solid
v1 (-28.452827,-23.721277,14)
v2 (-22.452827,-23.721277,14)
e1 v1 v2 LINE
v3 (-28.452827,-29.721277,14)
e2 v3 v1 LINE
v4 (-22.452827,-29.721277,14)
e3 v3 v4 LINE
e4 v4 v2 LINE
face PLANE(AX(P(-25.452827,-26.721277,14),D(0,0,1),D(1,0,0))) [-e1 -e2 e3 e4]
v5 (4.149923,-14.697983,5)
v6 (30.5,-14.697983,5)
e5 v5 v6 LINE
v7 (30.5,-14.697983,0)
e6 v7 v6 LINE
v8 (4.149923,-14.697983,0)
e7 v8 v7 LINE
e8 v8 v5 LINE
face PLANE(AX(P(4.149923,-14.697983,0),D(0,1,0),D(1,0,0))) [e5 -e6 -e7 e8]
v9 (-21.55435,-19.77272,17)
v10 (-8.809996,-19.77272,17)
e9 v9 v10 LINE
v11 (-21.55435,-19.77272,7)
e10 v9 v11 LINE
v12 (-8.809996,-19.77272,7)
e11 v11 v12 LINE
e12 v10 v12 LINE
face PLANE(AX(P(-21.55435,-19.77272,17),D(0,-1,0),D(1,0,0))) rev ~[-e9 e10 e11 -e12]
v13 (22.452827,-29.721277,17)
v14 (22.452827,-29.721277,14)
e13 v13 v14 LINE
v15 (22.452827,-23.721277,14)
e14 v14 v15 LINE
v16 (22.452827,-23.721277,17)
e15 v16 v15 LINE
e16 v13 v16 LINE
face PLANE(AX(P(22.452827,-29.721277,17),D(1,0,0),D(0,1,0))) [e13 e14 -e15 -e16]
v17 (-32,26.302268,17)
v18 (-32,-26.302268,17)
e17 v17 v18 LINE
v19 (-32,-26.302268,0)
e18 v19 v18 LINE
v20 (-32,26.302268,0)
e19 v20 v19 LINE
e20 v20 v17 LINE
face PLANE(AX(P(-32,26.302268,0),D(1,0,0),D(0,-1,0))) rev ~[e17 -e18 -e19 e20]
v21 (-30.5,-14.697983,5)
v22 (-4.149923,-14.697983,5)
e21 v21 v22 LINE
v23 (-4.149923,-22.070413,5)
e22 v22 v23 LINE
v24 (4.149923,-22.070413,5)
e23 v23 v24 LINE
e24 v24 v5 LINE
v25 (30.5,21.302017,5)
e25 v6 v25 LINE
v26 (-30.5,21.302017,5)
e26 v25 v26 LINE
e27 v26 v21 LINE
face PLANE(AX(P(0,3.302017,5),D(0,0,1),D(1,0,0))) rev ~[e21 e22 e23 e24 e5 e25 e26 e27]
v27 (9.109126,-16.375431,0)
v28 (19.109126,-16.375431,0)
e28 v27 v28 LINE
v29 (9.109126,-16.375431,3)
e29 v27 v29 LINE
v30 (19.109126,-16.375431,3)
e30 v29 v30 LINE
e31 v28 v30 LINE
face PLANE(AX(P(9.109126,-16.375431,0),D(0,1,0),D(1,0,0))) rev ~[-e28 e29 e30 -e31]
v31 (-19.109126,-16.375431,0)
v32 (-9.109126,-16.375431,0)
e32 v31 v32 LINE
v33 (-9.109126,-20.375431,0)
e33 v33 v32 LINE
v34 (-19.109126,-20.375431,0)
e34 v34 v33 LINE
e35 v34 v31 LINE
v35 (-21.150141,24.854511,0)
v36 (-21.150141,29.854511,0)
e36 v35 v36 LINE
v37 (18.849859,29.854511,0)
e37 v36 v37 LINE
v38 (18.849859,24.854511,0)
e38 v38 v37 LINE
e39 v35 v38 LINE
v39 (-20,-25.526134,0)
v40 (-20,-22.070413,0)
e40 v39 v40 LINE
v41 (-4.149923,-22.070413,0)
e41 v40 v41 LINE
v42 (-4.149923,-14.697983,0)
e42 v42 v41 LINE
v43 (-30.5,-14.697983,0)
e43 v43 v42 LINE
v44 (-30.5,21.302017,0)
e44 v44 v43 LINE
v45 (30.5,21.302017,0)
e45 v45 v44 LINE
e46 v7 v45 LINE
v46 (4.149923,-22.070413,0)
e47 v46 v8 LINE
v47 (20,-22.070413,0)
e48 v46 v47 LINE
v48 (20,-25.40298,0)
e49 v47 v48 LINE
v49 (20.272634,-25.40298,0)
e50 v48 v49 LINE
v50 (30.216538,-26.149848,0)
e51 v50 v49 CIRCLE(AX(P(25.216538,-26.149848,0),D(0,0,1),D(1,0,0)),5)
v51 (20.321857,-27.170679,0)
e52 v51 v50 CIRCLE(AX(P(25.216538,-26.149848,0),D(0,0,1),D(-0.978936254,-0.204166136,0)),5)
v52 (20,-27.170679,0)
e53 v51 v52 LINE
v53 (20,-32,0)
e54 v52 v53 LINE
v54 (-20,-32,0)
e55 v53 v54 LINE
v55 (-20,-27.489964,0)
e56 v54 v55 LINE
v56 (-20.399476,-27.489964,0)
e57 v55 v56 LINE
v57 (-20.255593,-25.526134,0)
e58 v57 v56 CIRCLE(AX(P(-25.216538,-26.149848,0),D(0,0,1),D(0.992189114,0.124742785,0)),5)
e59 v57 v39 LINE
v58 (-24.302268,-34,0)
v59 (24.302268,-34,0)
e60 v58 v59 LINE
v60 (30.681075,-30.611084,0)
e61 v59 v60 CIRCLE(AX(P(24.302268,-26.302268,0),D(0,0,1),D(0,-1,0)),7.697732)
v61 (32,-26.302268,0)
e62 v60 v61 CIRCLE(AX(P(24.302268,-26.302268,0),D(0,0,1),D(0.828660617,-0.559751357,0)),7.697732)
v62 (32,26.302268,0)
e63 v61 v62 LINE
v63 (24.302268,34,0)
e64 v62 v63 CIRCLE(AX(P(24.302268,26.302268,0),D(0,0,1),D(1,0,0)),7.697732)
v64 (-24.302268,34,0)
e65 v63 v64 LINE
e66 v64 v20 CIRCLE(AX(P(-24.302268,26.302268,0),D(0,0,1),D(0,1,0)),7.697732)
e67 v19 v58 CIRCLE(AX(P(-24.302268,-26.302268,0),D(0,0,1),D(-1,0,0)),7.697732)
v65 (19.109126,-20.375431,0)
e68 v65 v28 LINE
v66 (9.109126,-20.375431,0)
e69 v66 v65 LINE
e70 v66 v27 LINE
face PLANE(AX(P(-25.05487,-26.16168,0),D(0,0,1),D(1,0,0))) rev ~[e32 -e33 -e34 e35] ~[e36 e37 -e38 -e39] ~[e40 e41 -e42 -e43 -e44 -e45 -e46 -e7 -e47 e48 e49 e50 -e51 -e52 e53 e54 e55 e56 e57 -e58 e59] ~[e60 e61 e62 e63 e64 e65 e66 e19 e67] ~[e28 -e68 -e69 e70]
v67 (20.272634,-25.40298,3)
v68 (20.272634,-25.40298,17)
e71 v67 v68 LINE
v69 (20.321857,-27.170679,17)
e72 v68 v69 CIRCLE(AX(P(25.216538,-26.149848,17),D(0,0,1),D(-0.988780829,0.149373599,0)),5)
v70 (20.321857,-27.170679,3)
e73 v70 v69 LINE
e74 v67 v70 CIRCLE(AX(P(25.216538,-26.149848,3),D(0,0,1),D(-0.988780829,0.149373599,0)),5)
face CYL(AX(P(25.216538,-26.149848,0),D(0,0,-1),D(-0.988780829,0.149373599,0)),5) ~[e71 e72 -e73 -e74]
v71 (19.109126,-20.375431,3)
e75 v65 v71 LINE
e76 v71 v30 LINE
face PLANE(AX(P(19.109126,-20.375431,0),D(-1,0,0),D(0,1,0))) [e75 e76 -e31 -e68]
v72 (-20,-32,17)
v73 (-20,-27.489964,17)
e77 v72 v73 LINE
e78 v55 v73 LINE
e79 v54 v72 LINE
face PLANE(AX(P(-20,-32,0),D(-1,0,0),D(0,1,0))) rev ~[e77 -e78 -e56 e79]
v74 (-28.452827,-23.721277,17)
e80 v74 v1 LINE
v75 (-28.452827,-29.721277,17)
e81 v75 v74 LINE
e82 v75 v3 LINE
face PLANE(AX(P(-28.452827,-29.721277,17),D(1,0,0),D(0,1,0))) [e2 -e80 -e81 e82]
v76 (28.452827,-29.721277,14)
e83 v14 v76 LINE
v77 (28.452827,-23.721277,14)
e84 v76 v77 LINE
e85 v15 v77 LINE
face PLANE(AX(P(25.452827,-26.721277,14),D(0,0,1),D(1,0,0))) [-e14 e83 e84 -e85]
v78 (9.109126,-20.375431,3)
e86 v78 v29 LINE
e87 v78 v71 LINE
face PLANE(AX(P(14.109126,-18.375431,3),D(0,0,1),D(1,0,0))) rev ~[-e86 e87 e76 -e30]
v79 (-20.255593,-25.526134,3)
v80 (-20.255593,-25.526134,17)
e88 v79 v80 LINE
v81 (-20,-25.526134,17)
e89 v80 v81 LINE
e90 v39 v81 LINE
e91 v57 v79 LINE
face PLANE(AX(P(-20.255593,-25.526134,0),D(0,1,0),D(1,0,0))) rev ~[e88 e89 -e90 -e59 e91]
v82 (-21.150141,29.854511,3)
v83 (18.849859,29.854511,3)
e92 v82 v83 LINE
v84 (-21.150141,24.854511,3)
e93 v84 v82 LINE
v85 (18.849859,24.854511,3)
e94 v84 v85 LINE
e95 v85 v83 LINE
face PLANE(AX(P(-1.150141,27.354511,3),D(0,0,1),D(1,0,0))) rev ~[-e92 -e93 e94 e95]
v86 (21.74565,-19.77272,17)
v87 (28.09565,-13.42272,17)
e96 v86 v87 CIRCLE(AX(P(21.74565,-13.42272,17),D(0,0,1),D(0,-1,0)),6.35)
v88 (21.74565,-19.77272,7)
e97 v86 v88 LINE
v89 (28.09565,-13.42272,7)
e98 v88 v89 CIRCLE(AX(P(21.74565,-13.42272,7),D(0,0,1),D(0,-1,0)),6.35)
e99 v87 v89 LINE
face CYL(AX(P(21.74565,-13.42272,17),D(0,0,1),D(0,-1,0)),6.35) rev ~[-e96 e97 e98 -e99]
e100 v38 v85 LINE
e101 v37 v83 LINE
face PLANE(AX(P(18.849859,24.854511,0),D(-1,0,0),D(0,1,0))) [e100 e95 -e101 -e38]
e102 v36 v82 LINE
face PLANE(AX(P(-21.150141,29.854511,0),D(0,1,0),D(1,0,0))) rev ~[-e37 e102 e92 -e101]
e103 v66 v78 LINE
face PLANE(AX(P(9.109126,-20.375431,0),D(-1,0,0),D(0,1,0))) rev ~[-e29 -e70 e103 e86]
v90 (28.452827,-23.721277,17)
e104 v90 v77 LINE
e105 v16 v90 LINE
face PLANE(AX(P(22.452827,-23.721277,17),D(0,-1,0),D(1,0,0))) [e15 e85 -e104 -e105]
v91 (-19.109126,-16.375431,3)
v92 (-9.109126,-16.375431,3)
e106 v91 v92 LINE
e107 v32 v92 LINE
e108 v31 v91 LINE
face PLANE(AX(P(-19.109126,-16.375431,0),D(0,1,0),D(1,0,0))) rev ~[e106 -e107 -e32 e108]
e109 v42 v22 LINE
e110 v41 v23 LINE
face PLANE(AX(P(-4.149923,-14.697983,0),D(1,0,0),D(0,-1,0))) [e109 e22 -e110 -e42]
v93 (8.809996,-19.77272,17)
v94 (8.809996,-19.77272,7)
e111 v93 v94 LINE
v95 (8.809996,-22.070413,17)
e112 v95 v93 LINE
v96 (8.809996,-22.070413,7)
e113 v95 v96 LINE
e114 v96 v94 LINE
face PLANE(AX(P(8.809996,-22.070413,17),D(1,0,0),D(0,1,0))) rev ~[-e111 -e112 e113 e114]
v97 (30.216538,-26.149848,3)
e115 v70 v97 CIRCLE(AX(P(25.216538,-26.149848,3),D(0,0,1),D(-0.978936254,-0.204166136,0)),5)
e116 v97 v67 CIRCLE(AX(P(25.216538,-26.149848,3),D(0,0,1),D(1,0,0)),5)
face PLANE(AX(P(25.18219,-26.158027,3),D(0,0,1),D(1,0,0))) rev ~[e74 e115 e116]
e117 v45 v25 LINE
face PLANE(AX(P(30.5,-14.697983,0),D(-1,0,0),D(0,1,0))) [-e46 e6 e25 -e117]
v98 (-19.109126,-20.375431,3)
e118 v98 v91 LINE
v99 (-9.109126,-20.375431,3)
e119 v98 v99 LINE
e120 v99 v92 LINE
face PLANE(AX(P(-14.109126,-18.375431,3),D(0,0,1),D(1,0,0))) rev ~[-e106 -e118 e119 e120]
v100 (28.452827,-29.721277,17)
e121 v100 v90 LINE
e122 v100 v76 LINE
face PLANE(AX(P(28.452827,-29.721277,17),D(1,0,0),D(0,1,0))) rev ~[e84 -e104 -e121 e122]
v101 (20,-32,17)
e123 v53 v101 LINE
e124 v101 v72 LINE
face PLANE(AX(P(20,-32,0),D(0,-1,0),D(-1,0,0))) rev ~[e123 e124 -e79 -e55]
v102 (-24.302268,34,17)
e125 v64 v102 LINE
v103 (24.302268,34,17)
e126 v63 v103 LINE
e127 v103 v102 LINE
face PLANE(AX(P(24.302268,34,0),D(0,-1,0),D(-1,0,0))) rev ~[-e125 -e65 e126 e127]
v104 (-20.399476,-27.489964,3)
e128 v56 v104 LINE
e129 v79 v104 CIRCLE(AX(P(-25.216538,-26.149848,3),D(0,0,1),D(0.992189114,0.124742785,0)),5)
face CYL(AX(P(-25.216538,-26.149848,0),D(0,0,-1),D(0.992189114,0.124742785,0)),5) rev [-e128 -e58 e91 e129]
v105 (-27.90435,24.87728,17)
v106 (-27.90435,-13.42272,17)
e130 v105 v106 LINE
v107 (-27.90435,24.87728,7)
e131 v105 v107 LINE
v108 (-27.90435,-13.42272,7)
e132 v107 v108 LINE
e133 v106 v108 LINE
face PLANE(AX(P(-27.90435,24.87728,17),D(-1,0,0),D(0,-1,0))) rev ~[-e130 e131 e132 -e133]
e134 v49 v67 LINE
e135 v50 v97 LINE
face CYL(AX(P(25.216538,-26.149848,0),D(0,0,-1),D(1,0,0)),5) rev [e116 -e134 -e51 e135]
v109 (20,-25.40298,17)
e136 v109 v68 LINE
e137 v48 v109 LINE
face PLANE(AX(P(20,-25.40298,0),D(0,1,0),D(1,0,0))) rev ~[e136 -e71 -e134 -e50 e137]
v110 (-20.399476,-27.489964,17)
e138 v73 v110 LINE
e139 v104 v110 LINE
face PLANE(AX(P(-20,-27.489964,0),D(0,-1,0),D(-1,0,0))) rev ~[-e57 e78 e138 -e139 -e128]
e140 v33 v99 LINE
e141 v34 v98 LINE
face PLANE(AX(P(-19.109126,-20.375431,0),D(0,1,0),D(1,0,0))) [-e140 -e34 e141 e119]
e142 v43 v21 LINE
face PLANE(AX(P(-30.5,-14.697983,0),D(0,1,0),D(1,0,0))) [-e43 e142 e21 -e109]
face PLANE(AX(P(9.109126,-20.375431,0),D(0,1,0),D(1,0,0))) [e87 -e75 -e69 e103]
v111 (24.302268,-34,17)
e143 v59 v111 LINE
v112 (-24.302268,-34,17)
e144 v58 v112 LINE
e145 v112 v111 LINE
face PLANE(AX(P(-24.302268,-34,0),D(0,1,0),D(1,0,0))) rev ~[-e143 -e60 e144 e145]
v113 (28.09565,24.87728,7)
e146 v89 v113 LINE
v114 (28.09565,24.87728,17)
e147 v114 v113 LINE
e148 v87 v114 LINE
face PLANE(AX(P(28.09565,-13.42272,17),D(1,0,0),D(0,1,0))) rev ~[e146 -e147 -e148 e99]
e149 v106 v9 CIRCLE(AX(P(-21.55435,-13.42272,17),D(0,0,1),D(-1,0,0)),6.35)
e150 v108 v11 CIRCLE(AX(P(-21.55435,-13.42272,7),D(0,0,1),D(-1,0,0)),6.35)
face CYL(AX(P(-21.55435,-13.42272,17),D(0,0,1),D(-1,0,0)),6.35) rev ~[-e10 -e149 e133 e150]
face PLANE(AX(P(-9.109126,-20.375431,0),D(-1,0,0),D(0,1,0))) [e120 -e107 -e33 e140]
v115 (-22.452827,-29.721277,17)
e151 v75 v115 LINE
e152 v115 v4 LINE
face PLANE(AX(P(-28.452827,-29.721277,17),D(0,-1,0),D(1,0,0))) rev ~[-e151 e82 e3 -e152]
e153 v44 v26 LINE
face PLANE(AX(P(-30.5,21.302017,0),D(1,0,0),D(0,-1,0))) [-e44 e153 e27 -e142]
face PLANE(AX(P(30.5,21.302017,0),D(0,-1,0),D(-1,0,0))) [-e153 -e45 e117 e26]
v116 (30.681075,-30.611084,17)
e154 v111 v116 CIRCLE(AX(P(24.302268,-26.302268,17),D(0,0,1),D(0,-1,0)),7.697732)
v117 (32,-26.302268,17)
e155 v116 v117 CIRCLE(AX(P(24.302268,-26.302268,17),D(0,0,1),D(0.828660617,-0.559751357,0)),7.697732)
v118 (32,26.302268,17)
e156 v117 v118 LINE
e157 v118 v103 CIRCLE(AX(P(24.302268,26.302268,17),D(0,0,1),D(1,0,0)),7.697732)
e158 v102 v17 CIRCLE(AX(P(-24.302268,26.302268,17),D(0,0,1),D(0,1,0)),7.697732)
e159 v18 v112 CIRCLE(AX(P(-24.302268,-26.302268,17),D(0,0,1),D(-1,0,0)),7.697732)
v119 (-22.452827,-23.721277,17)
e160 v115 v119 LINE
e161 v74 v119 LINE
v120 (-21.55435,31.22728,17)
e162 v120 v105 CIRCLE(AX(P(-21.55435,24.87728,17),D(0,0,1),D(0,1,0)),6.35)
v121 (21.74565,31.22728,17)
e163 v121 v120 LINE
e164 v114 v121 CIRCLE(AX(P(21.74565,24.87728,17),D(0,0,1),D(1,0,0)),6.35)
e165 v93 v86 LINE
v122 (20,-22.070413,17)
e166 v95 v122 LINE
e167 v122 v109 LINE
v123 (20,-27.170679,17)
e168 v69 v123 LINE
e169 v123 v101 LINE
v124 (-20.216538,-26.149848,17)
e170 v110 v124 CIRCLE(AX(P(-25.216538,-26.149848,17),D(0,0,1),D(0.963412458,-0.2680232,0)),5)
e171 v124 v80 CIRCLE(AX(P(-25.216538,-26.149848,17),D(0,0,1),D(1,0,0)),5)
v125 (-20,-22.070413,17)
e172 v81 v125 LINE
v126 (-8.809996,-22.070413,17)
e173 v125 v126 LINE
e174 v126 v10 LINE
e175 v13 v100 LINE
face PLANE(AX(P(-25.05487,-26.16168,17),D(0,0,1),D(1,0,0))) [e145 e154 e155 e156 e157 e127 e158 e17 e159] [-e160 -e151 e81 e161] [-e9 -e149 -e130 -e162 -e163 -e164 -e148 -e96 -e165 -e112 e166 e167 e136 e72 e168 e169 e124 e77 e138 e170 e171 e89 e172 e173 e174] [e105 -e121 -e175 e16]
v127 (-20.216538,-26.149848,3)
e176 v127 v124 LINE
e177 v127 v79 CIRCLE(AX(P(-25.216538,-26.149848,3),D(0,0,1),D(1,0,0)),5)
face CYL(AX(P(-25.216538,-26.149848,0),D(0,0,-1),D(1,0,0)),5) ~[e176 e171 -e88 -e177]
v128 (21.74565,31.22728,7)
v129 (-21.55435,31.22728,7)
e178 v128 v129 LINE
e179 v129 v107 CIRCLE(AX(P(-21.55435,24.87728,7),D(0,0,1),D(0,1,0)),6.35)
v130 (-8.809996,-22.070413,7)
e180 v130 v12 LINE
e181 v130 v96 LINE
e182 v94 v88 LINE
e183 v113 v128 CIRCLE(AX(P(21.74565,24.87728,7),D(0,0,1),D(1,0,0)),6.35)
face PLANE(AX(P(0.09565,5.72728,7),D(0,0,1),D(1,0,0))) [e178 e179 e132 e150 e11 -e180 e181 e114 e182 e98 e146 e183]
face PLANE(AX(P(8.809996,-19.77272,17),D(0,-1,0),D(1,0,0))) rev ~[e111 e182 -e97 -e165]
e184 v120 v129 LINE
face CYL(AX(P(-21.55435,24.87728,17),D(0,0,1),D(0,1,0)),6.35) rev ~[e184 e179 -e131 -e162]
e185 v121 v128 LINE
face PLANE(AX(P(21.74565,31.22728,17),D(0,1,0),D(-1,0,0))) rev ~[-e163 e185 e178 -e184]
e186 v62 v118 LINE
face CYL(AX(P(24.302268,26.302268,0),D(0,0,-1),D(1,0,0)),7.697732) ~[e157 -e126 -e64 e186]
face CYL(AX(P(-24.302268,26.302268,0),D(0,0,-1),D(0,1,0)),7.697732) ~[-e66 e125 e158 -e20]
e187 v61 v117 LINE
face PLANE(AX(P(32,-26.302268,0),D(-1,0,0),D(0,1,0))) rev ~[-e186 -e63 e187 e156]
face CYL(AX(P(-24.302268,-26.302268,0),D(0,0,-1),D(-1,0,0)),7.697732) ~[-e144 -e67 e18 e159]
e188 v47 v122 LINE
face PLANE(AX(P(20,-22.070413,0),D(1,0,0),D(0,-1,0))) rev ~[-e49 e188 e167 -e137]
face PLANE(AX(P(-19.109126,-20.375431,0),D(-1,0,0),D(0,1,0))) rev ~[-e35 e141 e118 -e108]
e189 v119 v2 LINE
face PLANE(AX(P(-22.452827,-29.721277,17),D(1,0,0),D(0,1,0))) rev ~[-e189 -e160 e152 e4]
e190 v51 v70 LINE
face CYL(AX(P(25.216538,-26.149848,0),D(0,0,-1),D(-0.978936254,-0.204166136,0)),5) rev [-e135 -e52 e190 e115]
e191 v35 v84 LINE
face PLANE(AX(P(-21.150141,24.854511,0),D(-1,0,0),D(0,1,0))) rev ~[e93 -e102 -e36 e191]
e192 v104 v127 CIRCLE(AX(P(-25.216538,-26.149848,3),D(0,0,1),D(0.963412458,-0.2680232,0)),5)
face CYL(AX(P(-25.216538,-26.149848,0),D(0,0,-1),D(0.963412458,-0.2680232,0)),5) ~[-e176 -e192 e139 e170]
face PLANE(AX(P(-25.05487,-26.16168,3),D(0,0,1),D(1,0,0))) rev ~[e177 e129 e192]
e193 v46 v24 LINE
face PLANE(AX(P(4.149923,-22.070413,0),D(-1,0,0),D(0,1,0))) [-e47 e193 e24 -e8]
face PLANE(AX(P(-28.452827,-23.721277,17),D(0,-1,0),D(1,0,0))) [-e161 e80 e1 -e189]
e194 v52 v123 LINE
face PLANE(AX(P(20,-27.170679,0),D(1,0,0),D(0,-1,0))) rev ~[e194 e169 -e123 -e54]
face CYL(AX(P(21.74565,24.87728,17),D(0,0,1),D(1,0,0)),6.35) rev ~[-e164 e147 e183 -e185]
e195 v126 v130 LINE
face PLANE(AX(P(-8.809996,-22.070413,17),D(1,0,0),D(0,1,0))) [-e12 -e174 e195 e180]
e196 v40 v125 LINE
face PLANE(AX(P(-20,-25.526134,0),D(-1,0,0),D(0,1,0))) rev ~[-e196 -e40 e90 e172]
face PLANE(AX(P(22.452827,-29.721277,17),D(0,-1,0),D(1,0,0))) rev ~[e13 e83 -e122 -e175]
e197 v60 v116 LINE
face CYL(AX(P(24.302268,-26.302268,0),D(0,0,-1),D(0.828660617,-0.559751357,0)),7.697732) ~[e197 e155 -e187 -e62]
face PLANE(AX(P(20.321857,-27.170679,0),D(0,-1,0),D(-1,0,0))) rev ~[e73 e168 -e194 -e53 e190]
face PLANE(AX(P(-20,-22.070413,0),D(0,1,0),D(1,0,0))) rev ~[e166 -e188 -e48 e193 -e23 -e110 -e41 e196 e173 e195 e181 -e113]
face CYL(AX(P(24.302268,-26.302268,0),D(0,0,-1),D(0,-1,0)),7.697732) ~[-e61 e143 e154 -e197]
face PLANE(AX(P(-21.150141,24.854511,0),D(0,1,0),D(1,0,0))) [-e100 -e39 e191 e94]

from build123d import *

# Parameters (mm, degrees)
F1_DEPTH  = 17
F2_DEPTH  = 5
F3_DEPTH  = 17
F4_DEPTH  = 3
F5_W      = 17.619991675
F5_H      = 2.2976936506
F6_DEPTH  = 10
F7_W      = 10
F7_H      = 4
F7_W_2    = 40
F7_H_2    = 5
F8_DEPTH  = 3
F9_W      = 6
F9_H      = 6
F10_DEPTH = 3


# Not quite as in the source:
# - a feature names something its author has since deleted; it is built from what else it names


with BuildPart() as f1:
    # F0 (on Top) → F1 (new body)
    with BuildSketch(Plane.XY):
        with BuildLine():
            Line((24.3022678875, 34), (-24.3022678875, 34))
            ThreePointArc((-24.3022678875, 34), (-29.745386464, 31.745386464), (-32, 26.3022678875))
            Line((-32, 26.3022678875), (-32, 15.1276998222))
            Line((-32, 15.1276998222), (-30.5, 15.1276998222))
            Line((-30.5, 15.1276998222), (-30.5, 21.3020170704))
            Line((-30.5, 21.3020170704), (30.5, 21.3020170704))
            Line((30.5, 21.3020170704), (30.5, 14.2477769405))
            Line((30.5, 14.2477769405), (32, 14.2477769405))
            Line((32, 14.2477769405), (32, 26.3022678875))
            ThreePointArc((32, 26.3022678875), (29.745386464, 31.745386464), (24.3022678875, 34))
        make_face()
        with BuildLine():
            Line((-30.5, 15.1276998222), (-32, 15.1276998222))
            Line((-32, 15.1276998222), (-32, -26.3022678875))
            ThreePointArc((-32, -26.3022678875), (-29.745386464, -31.745386464), (-24.3022678875, -34))
            Line((-24.3022678875, -34), (0, -34))
            Line((0, -34), (0, -32))
            Line((0, -32), (-20, -32))
            Line((-20, -32), (-20, -27.4899639189))
            Line((-20, -27.4899639189), (-20.3994758379, -27.4899639189))
            ThreePointArc((-20.3994758379, -27.4899639189), (-30.2031719041, -25.7844938681), (-20.255592559, -25.5261339915))
            Line((-20.255592559, -25.5261339915), (-20, -25.5261339915))
            Line((-20, -25.5261339915), (-20, -22.0704134554))
            Line((-20, -22.0704134554), (-4.1499226354, -22.0704134554))
            Line((-4.1499226354, -22.0704134554), (-4.1499226354, -14.6979829296))
            Line((-4.1499226354, -14.6979829296), (-30.5, -14.6979829296))
            Line((-30.5, -14.6979829296), (-30.5, 15.1276998222))
        make_face()
        with BuildLine():
            Line((32, -26.3022678875), (32, 14.2477769405))
            Line((32, 14.2477769405), (30.5, 14.2477769405))
            Line((30.5, 14.2477769405), (30.5, -14.6979829296))
            Line((30.5, -14.6979829296), (4.1499226354, -14.6979829296))
            Line((4.1499226354, -14.6979829296), (4.1499226354, -22.0704134554))
            Line((4.1499226354, -22.0704134554), (20, -22.0704134554))
            Line((20, -22.0704134554), (20, -25.4029799253))
            Line((20, -25.4029799253), (20.2726339823, -25.4029799253))
            ThreePointArc((20.2726339823, -25.4029799253), (25.5910239568, -21.1638916046), (30.2165381279, -26.1498479185))
            ThreePointArc((30.2165381279, -26.1498479185), (25.7296627026, -31.1234485429), (20.3218568596, -27.1706786007))
            Line((20.3218568596, -27.1706786007), (20, -27.1706786007))
            Line((20, -27.1706786007), (20, -32))
            Line((20, -32), (0, -32))
            Line((0, -32), (0, -34))
            Line((0, -34), (24.3022678875, -34))
            ThreePointArc((24.3022678875, -34), (27.9138443036, -33.100178998), (30.6810753302, -30.6110838832))
            ThreePointArc((30.6810753302, -30.6110838832), (31.6628871063, -28.555346757), (32, -26.3022678875))
        make_face()
        Polygon((-30.5, 21.3020170704), (-30.5, 15.1276998222), (-30.5, -14.6979829296), (-4.1499226354, -14.6979829296), (4.1499226354, -14.6979829296), (30.5, -14.6979829296), (30.5, 14.2477769405), (30.5, 21.3020170704), align=None)
        Polygon((4.1499226354, -14.6979829296), (-4.1499226354, -14.6979829296), (-4.1499226354, -22.0704134554), (0, -22.0704134554), (4.1499226354, -22.0704134554), align=None)
        with BuildLine():
            ThreePointArc((20.2726339823, -25.4029799253), (20.2184754644, -26.2890226707), (20.3218568596, -27.1706786007))
            ThreePointArc((20.3218568596, -27.1706786007), (25.7296627026, -31.1234485429), (30.2165381279, -26.1498479185))
            ThreePointArc((30.2165381279, -26.1498479185), (25.5910239568, -21.1638916046), (20.2726339823, -25.4029799253))
        make_face()
    extrude(amount=F1_DEPTH)

    # F0 (on Top) → F2 (cut)
    with BuildSketch(Plane.XY):
        Polygon((-30.5, 21.3020170704), (-30.5, 15.1276998222), (-30.5, -14.6979829296), (-4.1499226354, -14.6979829296), (4.1499226354, -14.6979829296), (30.5, -14.6979829296), (30.5, 14.2477769405), (30.5, 21.3020170704), align=None)
        Polygon((4.1499226354, -14.6979829296), (-4.1499226354, -14.6979829296), (-4.1499226354, -22.0704134554), (0, -22.0704134554), (4.1499226354, -22.0704134554), align=None)
    extrude(amount=F2_DEPTH, mode=Mode.SUBTRACT)

    # F0 (on Top) → F3 (join)
    with BuildSketch(Plane.XY):
        with BuildLine():
            ThreePointArc((-20.255592559, -25.5261339915), (-30.2031719041, -25.7844938681), (-20.3994758379, -27.4899639189))
            ThreePointArc((-20.3994758379, -27.4899639189), (-20.2624836545, -26.8261202565), (-20.2165381279, -26.1498479185))
            ThreePointArc((-20.2165381279, -26.1498479185), (-20.2263112871, -25.8373801956), (-20.255592559, -25.5261339915))
        make_face()
    extrude(amount=F3_DEPTH)

    # F0 (on Top) → F4 (cut)
    with BuildSketch(Plane.XY):
        with BuildLine():
            ThreePointArc((20.2726339823, -25.4029799253), (20.2184754644, -26.2890226707), (20.3218568596, -27.1706786007))
            ThreePointArc((20.3218568596, -27.1706786007), (25.7296627026, -31.1234485429), (30.2165381279, -26.1498479185))
            ThreePointArc((30.2165381279, -26.1498479185), (25.5910239568, -21.1638916046), (20.2726339823, -25.4029799253))
        make_face()
        with BuildLine():
            ThreePointArc((-20.255592559, -25.5261339915), (-30.2031719041, -25.7844938681), (-20.3994758379, -27.4899639189))
            ThreePointArc((-20.3994758379, -27.4899639189), (-20.2624836545, -26.8261202565), (-20.2165381279, -26.1498479185))
            ThreePointArc((-20.2165381279, -26.1498479185), (-20.2263112871, -25.8373801956), (-20.255592559, -25.5261339915))
        make_face()
    extrude(amount=F4_DEPTH, mode=Mode.SUBTRACT)

    # F5 (on face) → F6 (cut)
    with BuildSketch(Plane.XY.offset(17)):
        with BuildLine():
            Line((21.7456496224, 31.2272801952), (-21.5543503776, 31.2272801952))
            ThreePointArc((-21.5543503776, 31.2272801952), (-26.0444784382, 29.3674082557), (-27.9043503776, 24.8772801952))
            Line((-27.9043503776, 24.8772801952), (-27.9043503776, -13.4227198048))
            ThreePointArc((-27.9043503776, -13.4227198048), (-26.0444784382, -17.9128478653), (-21.5543503776, -19.7727198048))
            Line((-21.5543503776, -19.7727198048), (-8.8099958375, -19.7727198048))
            Line((-8.8099958375, -19.7727198048), (8.8099958375, -19.7727198048))
            Line((8.8099958375, -19.7727198048), (21.7456496224, -19.7727198048))
            ThreePointArc((21.7456496224, -19.7727198048), (26.2357776829, -17.9128478653), (28.0956496224, -13.4227198048))
            Line((28.0956496224, -13.4227198048), (28.0956496224, 24.8772801952))
            ThreePointArc((28.0956496224, 24.8772801952), (26.2357776829, 29.3674082557), (21.7456496224, 31.2272801952))
        make_face()
        with Locations((0, -20.9215666301)):
            Rectangle(F5_W, F5_H)
    extrude(amount=-F6_DEPTH, mode=Mode.SUBTRACT)

    # F7 (on face) → F8 (cut)
    with BuildSketch(Plane.XY):
        with Locations((-14.1091264039, -18.375430584)):
            Rectangle(F7_W, F7_H)
        with Locations((14.1091264039, -18.375430584)):
            Rectangle(F7_W, F7_H)
        with Locations((-1.1501409858, 27.3545110226)):
            Rectangle(F7_W_2, F7_H_2)
    extrude(amount=F8_DEPTH, mode=Mode.SUBTRACT)

    # F9 (on face) → F10 (cut)
    with BuildSketch(Plane.XY.offset(17)):
        with Locations((25.4528271034, -26.7212770808)):
            Rectangle(F9_W, F9_H)
        with Locations((-25.4528271034, -26.7212770808)):
            Rectangle(F9_W, F9_H)
    extrude(amount=-F10_DEPTH, mode=Mode.SUBTRACT)


solid = f1.part
